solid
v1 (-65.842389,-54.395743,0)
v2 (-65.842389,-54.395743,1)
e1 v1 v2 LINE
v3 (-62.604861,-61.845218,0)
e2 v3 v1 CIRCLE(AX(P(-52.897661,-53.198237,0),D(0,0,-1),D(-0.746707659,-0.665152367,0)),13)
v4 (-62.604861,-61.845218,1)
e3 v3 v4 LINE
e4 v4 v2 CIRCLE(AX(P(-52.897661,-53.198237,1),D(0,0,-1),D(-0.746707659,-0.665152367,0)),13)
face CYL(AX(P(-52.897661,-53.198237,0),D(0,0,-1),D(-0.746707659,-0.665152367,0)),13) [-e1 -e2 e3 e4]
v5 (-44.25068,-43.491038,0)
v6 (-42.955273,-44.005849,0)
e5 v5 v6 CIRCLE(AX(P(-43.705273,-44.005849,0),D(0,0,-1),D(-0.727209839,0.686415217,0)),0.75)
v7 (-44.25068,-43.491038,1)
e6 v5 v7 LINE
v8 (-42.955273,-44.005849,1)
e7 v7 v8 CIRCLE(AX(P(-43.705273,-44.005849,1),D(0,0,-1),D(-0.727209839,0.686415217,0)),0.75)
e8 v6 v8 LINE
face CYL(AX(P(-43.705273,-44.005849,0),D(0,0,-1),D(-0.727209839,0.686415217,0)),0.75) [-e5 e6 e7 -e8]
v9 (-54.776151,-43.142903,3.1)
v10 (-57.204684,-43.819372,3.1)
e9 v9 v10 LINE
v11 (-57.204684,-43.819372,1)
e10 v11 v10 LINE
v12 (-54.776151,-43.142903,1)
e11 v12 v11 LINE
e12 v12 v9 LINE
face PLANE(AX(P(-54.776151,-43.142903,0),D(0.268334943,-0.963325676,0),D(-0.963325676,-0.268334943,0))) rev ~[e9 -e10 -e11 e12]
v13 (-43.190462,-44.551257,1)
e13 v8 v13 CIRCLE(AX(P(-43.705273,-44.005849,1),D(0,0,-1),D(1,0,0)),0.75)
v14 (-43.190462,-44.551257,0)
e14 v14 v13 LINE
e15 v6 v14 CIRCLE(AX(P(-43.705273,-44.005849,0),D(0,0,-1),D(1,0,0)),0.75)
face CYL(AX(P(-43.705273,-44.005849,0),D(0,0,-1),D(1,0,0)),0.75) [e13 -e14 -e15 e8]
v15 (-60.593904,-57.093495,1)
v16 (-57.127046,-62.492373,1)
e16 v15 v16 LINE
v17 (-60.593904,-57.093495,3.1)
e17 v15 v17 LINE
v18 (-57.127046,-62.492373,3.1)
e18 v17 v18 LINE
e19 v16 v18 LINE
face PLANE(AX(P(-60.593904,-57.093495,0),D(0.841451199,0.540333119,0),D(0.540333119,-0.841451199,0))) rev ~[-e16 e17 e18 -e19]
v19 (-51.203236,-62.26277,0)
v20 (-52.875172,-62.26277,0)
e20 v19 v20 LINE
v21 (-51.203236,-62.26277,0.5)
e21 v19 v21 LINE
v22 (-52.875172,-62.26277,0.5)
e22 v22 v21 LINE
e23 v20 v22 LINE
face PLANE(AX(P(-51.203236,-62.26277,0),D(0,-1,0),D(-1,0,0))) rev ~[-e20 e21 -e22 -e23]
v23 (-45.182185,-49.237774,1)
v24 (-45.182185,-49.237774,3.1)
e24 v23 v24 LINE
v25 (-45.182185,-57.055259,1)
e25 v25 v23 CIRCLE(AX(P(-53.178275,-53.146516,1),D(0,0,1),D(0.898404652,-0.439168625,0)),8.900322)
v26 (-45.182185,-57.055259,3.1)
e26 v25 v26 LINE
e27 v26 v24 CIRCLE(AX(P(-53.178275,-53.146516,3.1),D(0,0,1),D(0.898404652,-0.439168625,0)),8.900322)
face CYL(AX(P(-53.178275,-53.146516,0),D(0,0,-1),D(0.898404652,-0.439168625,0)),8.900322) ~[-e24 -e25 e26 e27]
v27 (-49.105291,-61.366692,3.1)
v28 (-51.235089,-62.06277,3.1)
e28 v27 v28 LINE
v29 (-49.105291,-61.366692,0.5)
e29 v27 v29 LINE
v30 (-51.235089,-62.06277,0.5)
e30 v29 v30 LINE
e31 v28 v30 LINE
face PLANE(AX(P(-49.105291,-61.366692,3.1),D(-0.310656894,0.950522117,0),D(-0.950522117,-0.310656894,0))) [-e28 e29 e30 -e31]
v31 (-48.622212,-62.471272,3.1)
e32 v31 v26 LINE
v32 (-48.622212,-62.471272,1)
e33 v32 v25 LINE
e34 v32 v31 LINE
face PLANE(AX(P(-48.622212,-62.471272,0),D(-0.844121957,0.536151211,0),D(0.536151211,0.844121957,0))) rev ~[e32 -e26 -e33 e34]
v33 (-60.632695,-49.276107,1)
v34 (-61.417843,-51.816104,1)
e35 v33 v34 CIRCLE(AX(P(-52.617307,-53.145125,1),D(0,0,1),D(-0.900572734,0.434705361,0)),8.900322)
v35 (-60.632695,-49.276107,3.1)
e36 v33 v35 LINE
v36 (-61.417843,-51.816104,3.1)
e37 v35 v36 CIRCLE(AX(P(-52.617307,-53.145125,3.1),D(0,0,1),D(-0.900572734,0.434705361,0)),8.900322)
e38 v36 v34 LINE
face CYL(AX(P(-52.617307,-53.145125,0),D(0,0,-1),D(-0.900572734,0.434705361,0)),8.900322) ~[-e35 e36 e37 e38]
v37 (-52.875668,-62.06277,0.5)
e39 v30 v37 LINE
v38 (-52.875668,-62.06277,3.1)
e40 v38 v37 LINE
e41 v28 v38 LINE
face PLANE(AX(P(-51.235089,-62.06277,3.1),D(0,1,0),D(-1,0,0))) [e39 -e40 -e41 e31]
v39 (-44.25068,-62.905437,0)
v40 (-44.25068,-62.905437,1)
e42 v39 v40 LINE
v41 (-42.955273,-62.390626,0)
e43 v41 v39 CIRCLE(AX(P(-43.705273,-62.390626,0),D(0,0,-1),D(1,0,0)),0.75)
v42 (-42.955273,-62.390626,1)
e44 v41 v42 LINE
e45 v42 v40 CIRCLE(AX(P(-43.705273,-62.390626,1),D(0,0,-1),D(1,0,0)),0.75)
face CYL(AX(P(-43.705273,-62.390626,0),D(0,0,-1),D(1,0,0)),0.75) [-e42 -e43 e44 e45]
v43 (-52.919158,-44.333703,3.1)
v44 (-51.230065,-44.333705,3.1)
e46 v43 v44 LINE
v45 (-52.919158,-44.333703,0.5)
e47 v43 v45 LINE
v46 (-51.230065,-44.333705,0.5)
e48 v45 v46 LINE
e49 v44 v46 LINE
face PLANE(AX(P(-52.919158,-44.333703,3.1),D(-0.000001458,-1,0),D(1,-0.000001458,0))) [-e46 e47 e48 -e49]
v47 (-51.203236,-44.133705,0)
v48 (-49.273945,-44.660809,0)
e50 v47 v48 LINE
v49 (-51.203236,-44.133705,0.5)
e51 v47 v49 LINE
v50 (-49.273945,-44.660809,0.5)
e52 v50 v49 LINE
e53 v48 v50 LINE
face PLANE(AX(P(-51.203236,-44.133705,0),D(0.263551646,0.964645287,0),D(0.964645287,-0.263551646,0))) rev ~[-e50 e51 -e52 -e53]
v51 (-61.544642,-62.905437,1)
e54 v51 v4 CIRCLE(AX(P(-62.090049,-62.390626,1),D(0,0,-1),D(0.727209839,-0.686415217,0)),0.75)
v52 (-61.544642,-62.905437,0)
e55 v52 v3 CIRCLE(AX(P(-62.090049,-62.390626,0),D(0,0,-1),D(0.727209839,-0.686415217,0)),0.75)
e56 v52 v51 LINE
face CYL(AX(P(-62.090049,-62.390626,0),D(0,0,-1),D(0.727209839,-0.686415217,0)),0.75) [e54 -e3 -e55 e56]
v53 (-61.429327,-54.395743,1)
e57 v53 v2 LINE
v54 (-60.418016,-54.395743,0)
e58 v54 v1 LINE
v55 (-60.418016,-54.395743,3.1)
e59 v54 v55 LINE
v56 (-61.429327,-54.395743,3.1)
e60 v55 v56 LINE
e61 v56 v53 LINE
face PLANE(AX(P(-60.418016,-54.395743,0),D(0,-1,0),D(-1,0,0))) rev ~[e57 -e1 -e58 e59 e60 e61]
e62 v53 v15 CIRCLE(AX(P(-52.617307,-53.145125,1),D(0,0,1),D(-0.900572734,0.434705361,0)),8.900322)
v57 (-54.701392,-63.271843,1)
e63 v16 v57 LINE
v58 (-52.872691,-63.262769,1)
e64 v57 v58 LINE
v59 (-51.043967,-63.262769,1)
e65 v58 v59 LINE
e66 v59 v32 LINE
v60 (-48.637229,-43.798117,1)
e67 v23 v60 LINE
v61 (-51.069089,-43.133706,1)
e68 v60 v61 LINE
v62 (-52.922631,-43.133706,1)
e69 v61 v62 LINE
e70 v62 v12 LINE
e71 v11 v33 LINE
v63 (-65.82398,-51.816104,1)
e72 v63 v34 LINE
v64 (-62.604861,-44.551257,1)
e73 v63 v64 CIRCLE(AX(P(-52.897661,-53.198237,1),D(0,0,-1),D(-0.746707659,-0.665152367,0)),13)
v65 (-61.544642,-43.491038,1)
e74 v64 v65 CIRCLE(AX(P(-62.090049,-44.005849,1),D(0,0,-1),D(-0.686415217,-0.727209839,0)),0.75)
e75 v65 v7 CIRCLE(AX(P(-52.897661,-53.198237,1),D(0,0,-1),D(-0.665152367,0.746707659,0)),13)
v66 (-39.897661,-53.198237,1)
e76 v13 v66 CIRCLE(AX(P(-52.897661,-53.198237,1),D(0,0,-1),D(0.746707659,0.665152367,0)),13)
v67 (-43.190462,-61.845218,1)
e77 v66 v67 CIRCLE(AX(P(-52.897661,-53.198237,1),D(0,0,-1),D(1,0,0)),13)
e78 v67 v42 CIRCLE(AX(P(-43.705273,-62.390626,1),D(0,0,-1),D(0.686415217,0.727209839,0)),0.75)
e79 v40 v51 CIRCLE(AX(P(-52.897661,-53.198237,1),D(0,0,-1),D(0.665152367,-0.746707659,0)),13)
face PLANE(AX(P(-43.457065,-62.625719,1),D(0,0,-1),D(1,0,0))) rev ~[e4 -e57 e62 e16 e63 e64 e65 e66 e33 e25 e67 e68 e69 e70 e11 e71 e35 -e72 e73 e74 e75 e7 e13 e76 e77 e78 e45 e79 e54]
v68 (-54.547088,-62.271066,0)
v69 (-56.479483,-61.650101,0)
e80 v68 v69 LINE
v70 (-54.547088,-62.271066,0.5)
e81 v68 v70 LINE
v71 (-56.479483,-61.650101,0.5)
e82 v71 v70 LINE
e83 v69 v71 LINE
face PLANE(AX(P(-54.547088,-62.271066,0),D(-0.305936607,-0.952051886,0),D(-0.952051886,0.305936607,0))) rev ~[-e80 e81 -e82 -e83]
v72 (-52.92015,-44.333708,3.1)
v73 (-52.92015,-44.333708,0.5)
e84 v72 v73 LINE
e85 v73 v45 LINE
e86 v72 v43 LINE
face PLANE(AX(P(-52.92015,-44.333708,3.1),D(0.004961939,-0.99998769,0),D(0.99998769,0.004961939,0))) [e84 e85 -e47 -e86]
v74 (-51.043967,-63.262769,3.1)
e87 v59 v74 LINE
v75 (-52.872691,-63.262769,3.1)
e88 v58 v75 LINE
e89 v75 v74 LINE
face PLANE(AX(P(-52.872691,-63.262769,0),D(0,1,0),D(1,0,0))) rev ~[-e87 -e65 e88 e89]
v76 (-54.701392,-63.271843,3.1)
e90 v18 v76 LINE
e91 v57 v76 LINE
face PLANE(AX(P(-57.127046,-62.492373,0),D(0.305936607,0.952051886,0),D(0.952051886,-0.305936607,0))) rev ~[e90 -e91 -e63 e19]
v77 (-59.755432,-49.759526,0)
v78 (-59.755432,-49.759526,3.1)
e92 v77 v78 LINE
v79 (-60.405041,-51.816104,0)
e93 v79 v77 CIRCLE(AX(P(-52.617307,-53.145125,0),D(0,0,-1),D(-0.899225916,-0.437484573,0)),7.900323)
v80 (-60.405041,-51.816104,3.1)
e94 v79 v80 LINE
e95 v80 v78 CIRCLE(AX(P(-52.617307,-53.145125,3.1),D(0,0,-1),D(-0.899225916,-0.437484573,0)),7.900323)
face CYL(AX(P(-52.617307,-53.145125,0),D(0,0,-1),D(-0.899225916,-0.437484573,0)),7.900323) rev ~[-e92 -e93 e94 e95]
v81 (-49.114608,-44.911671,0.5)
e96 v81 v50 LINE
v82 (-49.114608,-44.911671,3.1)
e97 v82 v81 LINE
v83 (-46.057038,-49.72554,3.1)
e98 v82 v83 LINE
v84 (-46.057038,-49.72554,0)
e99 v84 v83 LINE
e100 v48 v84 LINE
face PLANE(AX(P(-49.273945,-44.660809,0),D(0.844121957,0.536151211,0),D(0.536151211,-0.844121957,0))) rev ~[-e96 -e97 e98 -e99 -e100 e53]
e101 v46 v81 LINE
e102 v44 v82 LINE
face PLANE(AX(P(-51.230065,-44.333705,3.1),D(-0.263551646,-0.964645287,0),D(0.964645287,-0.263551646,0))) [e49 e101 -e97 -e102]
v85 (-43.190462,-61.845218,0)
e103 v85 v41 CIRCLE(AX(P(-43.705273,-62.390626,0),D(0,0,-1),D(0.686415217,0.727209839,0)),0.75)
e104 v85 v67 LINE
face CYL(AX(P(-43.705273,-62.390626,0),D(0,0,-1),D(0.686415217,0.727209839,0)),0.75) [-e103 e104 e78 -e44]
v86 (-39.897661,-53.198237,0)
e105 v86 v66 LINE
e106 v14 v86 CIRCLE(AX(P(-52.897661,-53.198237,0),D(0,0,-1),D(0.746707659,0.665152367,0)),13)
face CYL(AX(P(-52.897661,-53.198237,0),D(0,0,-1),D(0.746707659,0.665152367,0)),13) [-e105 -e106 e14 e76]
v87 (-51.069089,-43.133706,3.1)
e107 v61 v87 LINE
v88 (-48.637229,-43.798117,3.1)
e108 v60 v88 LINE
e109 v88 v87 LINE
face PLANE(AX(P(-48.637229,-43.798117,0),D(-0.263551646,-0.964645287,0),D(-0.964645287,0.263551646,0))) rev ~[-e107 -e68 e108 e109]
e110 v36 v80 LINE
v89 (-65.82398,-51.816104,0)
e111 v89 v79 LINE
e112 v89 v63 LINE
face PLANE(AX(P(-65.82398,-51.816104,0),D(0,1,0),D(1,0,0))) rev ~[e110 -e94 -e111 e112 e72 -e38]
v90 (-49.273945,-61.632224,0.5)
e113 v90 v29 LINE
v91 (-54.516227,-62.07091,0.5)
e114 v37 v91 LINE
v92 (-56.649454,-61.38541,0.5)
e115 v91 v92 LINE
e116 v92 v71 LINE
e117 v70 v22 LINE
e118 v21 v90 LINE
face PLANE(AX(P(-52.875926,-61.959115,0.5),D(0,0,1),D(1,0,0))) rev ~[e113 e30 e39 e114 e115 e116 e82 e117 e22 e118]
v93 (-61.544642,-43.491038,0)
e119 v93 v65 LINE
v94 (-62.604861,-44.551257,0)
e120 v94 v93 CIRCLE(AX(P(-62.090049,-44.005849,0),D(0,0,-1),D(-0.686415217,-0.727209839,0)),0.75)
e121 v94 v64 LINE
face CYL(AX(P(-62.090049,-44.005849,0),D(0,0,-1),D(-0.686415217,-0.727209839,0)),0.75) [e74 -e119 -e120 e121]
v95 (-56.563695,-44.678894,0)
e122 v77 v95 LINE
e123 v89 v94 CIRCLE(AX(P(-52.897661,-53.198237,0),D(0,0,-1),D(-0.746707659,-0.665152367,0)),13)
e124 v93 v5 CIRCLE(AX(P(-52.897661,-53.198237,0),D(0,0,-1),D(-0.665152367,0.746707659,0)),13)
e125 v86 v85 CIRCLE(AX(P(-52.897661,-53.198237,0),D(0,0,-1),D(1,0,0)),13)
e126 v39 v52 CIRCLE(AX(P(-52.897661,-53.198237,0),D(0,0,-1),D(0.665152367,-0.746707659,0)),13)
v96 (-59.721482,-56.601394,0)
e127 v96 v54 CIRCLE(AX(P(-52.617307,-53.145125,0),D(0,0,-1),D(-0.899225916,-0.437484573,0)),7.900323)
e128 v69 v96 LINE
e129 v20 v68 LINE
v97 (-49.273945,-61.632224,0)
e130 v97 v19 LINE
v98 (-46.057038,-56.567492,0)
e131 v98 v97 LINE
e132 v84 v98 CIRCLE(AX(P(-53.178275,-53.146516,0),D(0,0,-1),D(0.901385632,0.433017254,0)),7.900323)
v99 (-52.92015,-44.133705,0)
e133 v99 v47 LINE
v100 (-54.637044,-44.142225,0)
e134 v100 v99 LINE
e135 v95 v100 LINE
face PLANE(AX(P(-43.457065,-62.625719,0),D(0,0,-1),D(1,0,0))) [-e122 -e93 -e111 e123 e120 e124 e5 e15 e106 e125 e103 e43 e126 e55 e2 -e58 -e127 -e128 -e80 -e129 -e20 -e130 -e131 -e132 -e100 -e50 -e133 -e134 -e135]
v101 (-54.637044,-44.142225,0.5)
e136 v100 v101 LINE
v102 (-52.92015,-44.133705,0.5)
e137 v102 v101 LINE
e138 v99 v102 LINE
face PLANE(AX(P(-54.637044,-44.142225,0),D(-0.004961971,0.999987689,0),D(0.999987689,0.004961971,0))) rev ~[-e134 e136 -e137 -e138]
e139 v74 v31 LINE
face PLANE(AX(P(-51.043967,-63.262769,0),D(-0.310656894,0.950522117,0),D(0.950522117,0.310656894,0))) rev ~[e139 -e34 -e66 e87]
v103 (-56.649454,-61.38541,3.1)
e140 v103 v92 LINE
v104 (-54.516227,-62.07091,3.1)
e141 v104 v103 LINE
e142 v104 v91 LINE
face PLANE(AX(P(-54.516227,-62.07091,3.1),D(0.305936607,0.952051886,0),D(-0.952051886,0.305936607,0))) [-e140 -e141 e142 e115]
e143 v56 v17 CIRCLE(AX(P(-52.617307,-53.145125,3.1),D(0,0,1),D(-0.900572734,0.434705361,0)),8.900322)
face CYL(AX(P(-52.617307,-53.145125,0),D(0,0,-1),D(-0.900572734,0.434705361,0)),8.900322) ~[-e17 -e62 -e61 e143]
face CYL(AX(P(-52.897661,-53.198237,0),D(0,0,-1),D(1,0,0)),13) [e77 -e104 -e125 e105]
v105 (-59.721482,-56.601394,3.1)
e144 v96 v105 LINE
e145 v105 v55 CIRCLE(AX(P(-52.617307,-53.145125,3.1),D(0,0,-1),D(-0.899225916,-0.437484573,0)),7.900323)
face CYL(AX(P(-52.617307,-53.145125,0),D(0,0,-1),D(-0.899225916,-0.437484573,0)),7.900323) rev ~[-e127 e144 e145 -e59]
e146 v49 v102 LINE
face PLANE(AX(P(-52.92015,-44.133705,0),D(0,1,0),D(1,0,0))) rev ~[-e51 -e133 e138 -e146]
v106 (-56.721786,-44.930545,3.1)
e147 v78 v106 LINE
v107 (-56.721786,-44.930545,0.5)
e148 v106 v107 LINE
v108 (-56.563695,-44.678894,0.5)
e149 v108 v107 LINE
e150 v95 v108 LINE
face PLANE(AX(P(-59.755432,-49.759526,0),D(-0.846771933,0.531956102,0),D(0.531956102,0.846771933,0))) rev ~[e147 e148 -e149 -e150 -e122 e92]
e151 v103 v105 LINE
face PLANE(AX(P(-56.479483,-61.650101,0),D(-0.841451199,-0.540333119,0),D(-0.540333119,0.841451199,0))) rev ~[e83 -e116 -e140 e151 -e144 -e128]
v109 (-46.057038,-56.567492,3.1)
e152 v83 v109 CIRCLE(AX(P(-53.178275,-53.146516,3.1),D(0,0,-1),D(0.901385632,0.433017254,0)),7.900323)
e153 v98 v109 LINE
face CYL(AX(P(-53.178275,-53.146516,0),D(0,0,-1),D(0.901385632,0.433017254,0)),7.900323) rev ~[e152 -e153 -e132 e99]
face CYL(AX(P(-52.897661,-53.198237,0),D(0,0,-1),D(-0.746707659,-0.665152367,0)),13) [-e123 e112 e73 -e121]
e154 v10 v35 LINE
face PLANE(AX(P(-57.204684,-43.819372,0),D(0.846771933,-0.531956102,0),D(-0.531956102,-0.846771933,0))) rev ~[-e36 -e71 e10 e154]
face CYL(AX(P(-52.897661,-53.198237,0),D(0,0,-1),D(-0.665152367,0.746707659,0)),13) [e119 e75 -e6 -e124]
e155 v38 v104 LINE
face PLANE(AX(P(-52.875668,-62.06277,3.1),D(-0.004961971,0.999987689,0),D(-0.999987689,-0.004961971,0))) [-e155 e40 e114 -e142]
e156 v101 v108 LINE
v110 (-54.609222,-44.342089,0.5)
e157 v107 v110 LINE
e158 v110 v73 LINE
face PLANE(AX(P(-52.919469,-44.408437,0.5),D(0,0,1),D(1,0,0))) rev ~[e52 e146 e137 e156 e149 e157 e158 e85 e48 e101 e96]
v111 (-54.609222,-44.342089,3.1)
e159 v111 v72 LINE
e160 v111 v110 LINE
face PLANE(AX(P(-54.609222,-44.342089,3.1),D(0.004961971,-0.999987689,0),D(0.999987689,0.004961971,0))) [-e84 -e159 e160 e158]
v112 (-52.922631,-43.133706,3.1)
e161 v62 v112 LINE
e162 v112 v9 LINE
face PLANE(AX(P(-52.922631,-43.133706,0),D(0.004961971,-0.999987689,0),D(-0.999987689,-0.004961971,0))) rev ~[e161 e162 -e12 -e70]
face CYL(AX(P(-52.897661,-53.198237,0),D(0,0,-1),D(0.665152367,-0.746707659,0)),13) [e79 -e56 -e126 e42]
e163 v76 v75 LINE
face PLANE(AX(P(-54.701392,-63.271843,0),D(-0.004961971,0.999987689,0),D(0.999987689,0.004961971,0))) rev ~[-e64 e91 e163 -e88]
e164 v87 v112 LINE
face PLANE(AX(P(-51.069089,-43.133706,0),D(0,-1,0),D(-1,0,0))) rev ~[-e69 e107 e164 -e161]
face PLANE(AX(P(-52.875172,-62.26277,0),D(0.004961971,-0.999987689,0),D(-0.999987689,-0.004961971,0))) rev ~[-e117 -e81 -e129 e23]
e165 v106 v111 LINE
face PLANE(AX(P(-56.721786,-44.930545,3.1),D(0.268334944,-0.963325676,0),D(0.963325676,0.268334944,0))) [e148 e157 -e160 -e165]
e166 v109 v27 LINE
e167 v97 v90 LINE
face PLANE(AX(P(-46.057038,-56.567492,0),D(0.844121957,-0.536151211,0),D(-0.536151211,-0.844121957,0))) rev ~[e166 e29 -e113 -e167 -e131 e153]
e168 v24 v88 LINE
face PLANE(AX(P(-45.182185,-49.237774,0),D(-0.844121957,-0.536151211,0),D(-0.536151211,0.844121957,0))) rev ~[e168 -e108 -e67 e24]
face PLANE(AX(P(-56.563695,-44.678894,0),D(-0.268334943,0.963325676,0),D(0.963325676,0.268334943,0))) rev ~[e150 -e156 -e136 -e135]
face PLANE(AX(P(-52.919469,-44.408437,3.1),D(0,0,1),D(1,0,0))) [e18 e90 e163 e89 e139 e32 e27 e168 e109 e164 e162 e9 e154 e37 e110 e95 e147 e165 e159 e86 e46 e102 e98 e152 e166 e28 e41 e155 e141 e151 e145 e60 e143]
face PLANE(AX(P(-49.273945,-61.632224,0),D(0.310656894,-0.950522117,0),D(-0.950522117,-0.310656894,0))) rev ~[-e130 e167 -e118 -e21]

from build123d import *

# Parameters (mm, degrees)
F1_DEPTH = 3.1
F3_DEPTH = 1
F5_DEPTH = 3.1
F7_DEPTH = 2.6


# Not quite as in the source:
# - ends of sketch curves that miss each other by under 0.0002 mm in the source are joined


with BuildPart() as f1:
    # F0 (on Top) → F1 (new body)
    with BuildSketch(Plane.XY):
        with BuildLine():
            Line((-45.1821846682, -49.2377741688), (-48.6372292437, -43.7981166044))
            Line((-48.6372292437, -43.7981166044), (-51.0690886894, -43.1337059986))
            Line((-51.0690886894, -43.1337059986), (-52.9226313652, -43.1337059986))
            Line((-52.9226313652, -43.1337059986), (-54.7761512226, -43.1429032238))
            Line((-54.7761512226, -43.1429032238), (-57.2046839443, -43.8193724666))
            Line((-57.2046839443, -43.8193724666), (-60.6326945623, -49.2761068966))
            ThreePointArc((-60.6326945623, -49.2761068966), (-61.5175196788, -53.1892877339), (-60.5939044307, -57.0934950318))
            Line((-60.5939044307, -57.0934950318), (-57.1270457212, -62.4923727119))
            Line((-57.1270457212, -62.4923727119), (-54.7013924586, -63.2718429691))
            Line((-54.7013924586, -63.2718429691), (-52.8726911435, -63.2627688943))
            Line((-52.8726911435, -63.2627688943), (-51.0439673156, -63.2627688943))
            Line((-51.0439673156, -63.2627688943), (-48.6222116233, -62.4712722115))
            Line((-48.6222116233, -62.4712722115), (-45.1821846682, -57.0552585424))
            ThreePointArc((-45.1821846682, -57.0552585424), (-44.2779533541, -53.1465163556), (-45.1821846682, -49.2377741688))
        make_face()
        with BuildLine():
            Line((-51.2032357795, -44.1337052485), (-49.2739452053, -44.6608085404))
            Line((-49.2739452053, -44.6608085404), (-46.0570379398, -49.725540285))
            ThreePointArc((-46.0570379398, -49.725540285), (-45.277952604, -53.1465163556), (-46.0570379398, -56.5674924262))
            Line((-46.0570379398, -56.5674924262), (-49.2739452053, -61.6322241709))
            Line((-49.2739452053, -61.6322241709), (-51.2032357795, -62.2627696444))
            Line((-51.2032357795, -62.2627696444), (-52.8751721425, -62.2627696444))
            Line((-52.8751721425, -62.2627696444), (-54.5470879228, -62.2710657443))
            Line((-54.5470879228, -62.2710657443), (-56.4794834946, -61.6501011173))
            Line((-56.4794834946, -61.6501011173), (-59.7214822105, -56.6013939237))
            ThreePointArc((-59.7214822105, -56.6013939237), (-60.5175327396, -53.1843257665), (-59.7554317793, -49.7595260114))
            Line((-59.7554317793, -49.7595260114), (-56.5636951686, -44.678894416))
            Line((-56.5636951686, -44.678894416), (-54.6370438166, -44.1422245291))
            Line((-54.6370438166, -44.1422245291), (-52.9201503662, -44.1337052485))
            Line((-52.9201503662, -44.1337052485), (-51.2032357795, -44.1337052485))
        make_face(mode=Mode.SUBTRACT)
    extrude(amount=F1_DEPTH)

    # F2 (on face) → F3 (join)
    with BuildSketch(Plane(origin=(0, 0, 0), x_dir=(1, 0, 0), z_dir=(0, 0, -1))):
        with BuildLine():
            ThreePointArc((-43.358584194, 62.0303384897), (-43.2740778057, 61.9381826183), (-43.1904616862, 61.8452182226))
            ThreePointArc((-43.1904616862, 61.8452182226), (-43.0165755747, 62.0936479592), (-42.9552730989, 62.3906256019))
            ThreePointArc((-42.9552730989, 62.3906256019), (-43.4282853143, 63.0876031964), (-44.2506804781, 62.9054370146))
            ThreePointArc((-44.2506804781, 62.9054370146), (-44.1577160825, 62.8218208951), (-44.0655602111, 62.7373145068))
            ThreePointArc((-44.0655602111, 62.7373145068), (-43.5183821629, 62.8543839205), (-43.2052730989, 62.3906256019))
            ThreePointArc((-43.2052730989, 62.3906256019), (-43.2451945988, 62.1948507981), (-43.358584194, 62.0303384897))
        make_face()
        with BuildLine():
            ThreePointArc((-44.0655602111, 62.7373145068), (-43.7052730989, 62.3906256019), (-43.358584194, 62.0303384897))
            ThreePointArc((-43.358584194, 62.0303384897), (-43.2451945988, 62.1948507981), (-43.2052730989, 62.3906256019))
            ThreePointArc((-43.2052730989, 62.3906256019), (-43.5183821629, 62.8543839205), (-44.0655602111, 62.7373145068))
        make_face()
        with BuildLine():
            ThreePointArc((-44.0655602111, 62.7373145068), (-44.0588264895, 62.0370722113), (-43.358584194, 62.0303384897))
            ThreePointArc((-43.358584194, 62.0303384897), (-43.7052730989, 62.3906256019), (-44.0655602111, 62.7373145068))
        make_face()
        with BuildLine():
            ThreePointArc((-43.1904616862, 44.5512566703), (-40.748719029, 48.5718778834), (-39.8976612543, 53.1982374465))
            ThreePointArc((-39.8976612543, 53.1982374465), (-40.748719029, 57.8245970095), (-43.1904616862, 61.8452182226))
            ThreePointArc((-43.1904616862, 61.8452182226), (-44.2356031848, 61.860295516), (-44.2506804781, 62.9054370146))
            ThreePointArc((-44.2506804781, 62.9054370146), (-52.8976612543, 66.1982374465), (-61.5446420305, 62.9054370146))
            ThreePointArc((-61.5446420305, 62.9054370146), (-61.3930718153, 62.6676133864), (-61.3400494097, 62.3906256019))
            ThreePointArc((-61.3400494097, 62.3906256019), (-61.7930717671, 61.7019280777), (-62.6048608225, 61.8452182226))
            ThreePointArc((-62.6048608225, 61.8452182226), (-65.8976612543, 53.1982374465), (-62.6048608225, 44.5512566703))
            ThreePointArc((-62.6048608225, 44.5512566703), (-61.7930717671, 44.6945468152), (-61.3400494097, 44.005849291))
            ThreePointArc((-61.3400494097, 44.005849291), (-61.3930718153, 43.7288615065), (-61.5446420305, 43.4910378783))
            ThreePointArc((-61.5446420305, 43.4910378783), (-52.8976612543, 40.1982374465), (-44.2506804781, 43.4910378783))
            ThreePointArc((-44.2506804781, 43.4910378783), (-44.2356031848, 44.5361793769), (-43.1904616862, 44.5512566703))
        make_face()
        with BuildLine():
            Line((-45.1821846682, 49.2377741688), (-48.6372292437, 43.7981166044))
            Line((-48.6372292437, 43.7981166044), (-51.0690886894, 43.1337059986))
            Line((-51.0690886894, 43.1337059986), (-52.9226313652, 43.1337059986))
            Line((-52.9226313652, 43.1337059986), (-54.7761512226, 43.1429032238))
            Line((-54.7761512226, 43.1429032238), (-57.2046839443, 43.8193724666))
            Line((-57.2046839443, 43.8193724666), (-60.6326945623, 49.2761068966))
            ThreePointArc((-60.6326945623, 49.2761068966), (-61.5175196788, 53.1892877339), (-60.5939044307, 57.0934950318))
            Line((-60.5939044307, 57.0934950318), (-57.1270457212, 62.4923727119))
            Line((-57.1270457212, 62.4923727119), (-54.7013924586, 63.2718429691))
            Line((-54.7013924586, 63.2718429691), (-52.8726911435, 63.2627688943))
            Line((-52.8726911435, 63.2627688943), (-51.0439673156, 63.2627688943))
            Line((-51.0439673156, 63.2627688943), (-48.6222116233, 62.4712722115))
            Line((-48.6222116233, 62.4712722115), (-45.1821846682, 57.0552585424))
            ThreePointArc((-45.1821846682, 57.0552585424), (-44.2779533541, 53.1465163556), (-45.1821846682, 49.2377741688))
        make_face(mode=Mode.SUBTRACT)
        with BuildLine():
            ThreePointArc((-44.2506804781, 62.9054370146), (-44.2356031848, 61.860295516), (-43.1904616862, 61.8452182226))
            ThreePointArc((-43.1904616862, 61.8452182226), (-43.2740778057, 61.9381826183), (-43.358584194, 62.0303384897))
            ThreePointArc((-43.358584194, 62.0303384897), (-44.0588264895, 62.0370722113), (-44.0655602111, 62.7373145068))
            ThreePointArc((-44.0655602111, 62.7373145068), (-44.1577160825, 62.8218208951), (-44.2506804781, 62.9054370146))
        make_face()
        with BuildLine():
            ThreePointArc((-61.7297622975, 62.7373145068), (-61.6376064262, 62.8218208951), (-61.5446420305, 62.9054370146))
            ThreePointArc((-61.5446420305, 62.9054370146), (-62.6203794956, 62.9209556878), (-62.6048608225, 61.8452182226))
            ThreePointArc((-62.6048608225, 61.8452182226), (-62.521244703, 61.9381826183), (-62.4367383146, 62.0303384897))
            ThreePointArc((-62.4367383146, 62.0303384897), (-62.4436028003, 62.7441789925), (-61.7297622975, 62.7373145068))
        make_face()
        with BuildLine():
            ThreePointArc((-61.3400494097, 62.3906256019), (-61.3930718153, 62.6676133864), (-61.5446420305, 62.9054370146))
            ThreePointArc((-61.5446420305, 62.9054370146), (-61.6376064262, 62.8218208951), (-61.7297622975, 62.7373145068))
            ThreePointArc((-61.7297622975, 62.7373145068), (-61.6262910912, 62.5775165378), (-61.5900494097, 62.3906256019))
            ThreePointArc((-61.5900494097, 62.3906256019), (-61.894274606, 61.9305471018), (-62.4367383146, 62.0303384897))
            ThreePointArc((-62.4367383146, 62.0303384897), (-62.521244703, 61.9381826183), (-62.6048608225, 61.8452182226))
            ThreePointArc((-62.6048608225, 61.8452182226), (-61.7930717671, 61.7019280777), (-61.3400494097, 62.3906256019))
        make_face()
        with BuildLine():
            ThreePointArc((-62.4367383146, 62.0303384897), (-62.0900494097, 62.3906256019), (-61.7297622975, 62.7373145068))
            ThreePointArc((-61.7297622975, 62.7373145068), (-62.4436028003, 62.7441789925), (-62.4367383146, 62.0303384897))
        make_face()
        with BuildLine():
            ThreePointArc((-61.5900494097, 62.3906256019), (-61.6262910912, 62.5775165378), (-61.7297622975, 62.7373145068))
            ThreePointArc((-61.7297622975, 62.7373145068), (-62.0900494097, 62.3906256019), (-62.4367383146, 62.0303384897))
            ThreePointArc((-62.4367383146, 62.0303384897), (-61.894274606, 61.9305471018), (-61.5900494097, 62.3906256019))
        make_face()
        with BuildLine():
            ThreePointArc((-42.9552730989, 44.005849291), (-43.0165755747, 44.3028269337), (-43.1904616862, 44.5512566703))
            ThreePointArc((-43.1904616862, 44.5512566703), (-43.2740778057, 44.4582922746), (-43.358584194, 44.3661364032))
            ThreePointArc((-43.358584194, 44.3661364032), (-43.2451945988, 44.2016240948), (-43.2052730989, 44.005849291))
            ThreePointArc((-43.2052730989, 44.005849291), (-43.5183821629, 43.5420909724), (-44.0655602111, 43.6591603861))
            ThreePointArc((-44.0655602111, 43.6591603861), (-44.1577160825, 43.5746539978), (-44.2506804781, 43.4910378783))
            ThreePointArc((-44.2506804781, 43.4910378783), (-43.4282853143, 43.3088716965), (-42.9552730989, 44.005849291))
        make_face()
        with BuildLine():
            ThreePointArc((-43.2052730989, 44.005849291), (-43.2451945988, 44.2016240948), (-43.358584194, 44.3661364032))
            ThreePointArc((-43.358584194, 44.3661364032), (-43.7052730989, 44.005849291), (-44.0655602111, 43.6591603861))
            ThreePointArc((-44.0655602111, 43.6591603861), (-43.5183821629, 43.5420909724), (-43.2052730989, 44.005849291))
        make_face()
        with BuildLine():
            ThreePointArc((-44.0655602111, 43.6591603861), (-43.7052730989, 44.005849291), (-43.358584194, 44.3661364032))
            ThreePointArc((-43.358584194, 44.3661364032), (-44.0588264895, 44.3594026816), (-44.0655602111, 43.6591603861))
        make_face()
        with BuildLine():
            ThreePointArc((-43.358584194, 44.3661364032), (-43.2740778057, 44.4582922746), (-43.1904616862, 44.5512566703))
            ThreePointArc((-43.1904616862, 44.5512566703), (-44.2356031848, 44.5361793769), (-44.2506804781, 43.4910378783))
            ThreePointArc((-44.2506804781, 43.4910378783), (-44.1577160825, 43.5746539978), (-44.0655602111, 43.6591603861))
            ThreePointArc((-44.0655602111, 43.6591603861), (-44.0588264895, 44.3594026816), (-43.358584194, 44.3661364032))
        make_face()
        with BuildLine():
            ThreePointArc((-62.6048608225, 44.5512566703), (-62.6203794956, 43.4755192051), (-61.5446420305, 43.4910378783))
            ThreePointArc((-61.5446420305, 43.4910378783), (-61.6376064262, 43.5746539978), (-61.7297622975, 43.6591603861))
            ThreePointArc((-61.7297622975, 43.6591603861), (-62.4436028003, 43.6522959004), (-62.4367383146, 44.3661364032))
            ThreePointArc((-62.4367383146, 44.3661364032), (-62.521244703, 44.4582922746), (-62.6048608225, 44.5512566703))
        make_face()
        with BuildLine():
            ThreePointArc((-62.4367383146, 44.3661364032), (-62.4436028003, 43.6522959004), (-61.7297622975, 43.6591603861))
            ThreePointArc((-61.7297622975, 43.6591603861), (-62.0900494097, 44.005849291), (-62.4367383146, 44.3661364032))
        make_face()
        with BuildLine():
            ThreePointArc((-62.4367383146, 44.3661364032), (-62.0900494097, 44.005849291), (-61.7297622975, 43.6591603861))
            ThreePointArc((-61.7297622975, 43.6591603861), (-61.6262910912, 43.8189583551), (-61.5900494097, 44.005849291))
            ThreePointArc((-61.5900494097, 44.005849291), (-61.894274606, 44.4659277911), (-62.4367383146, 44.3661364032))
        make_face()
        with BuildLine():
            ThreePointArc((-61.7297622975, 43.6591603861), (-61.6376064262, 43.5746539978), (-61.5446420305, 43.4910378783))
            ThreePointArc((-61.5446420305, 43.4910378783), (-61.3930718153, 43.7288615065), (-61.3400494097, 44.005849291))
            ThreePointArc((-61.3400494097, 44.005849291), (-61.7930717671, 44.6945468152), (-62.6048608225, 44.5512566703))
            ThreePointArc((-62.6048608225, 44.5512566703), (-62.521244703, 44.4582922746), (-62.4367383146, 44.3661364032))
            ThreePointArc((-62.4367383146, 44.3661364032), (-61.894274606, 44.4659277911), (-61.5900494097, 44.005849291))
            ThreePointArc((-61.5900494097, 44.005849291), (-61.6262910912, 43.8189583551), (-61.7297622975, 43.6591603861))
        make_face()
    extrude(amount=-F3_DEPTH)

    # F4 (on face) → F5 (cut)
    with BuildSketch(Plane(origin=(0, 0, 0), x_dir=(1, 0, 0), z_dir=(0, 0, -1))):
        with BuildLine():
            Line((-60.4180157971, 54.3957427144), (-65.8423891824, 54.3957427144))
            ThreePointArc((-65.8423891824, 54.3957427144), (-65.8973302268, 53.1054656449), (-65.8239796584, 51.8161041253))
            Line((-65.8239796584, 51.8161041253), (-60.4050414596, 51.8161041253))
            ThreePointArc((-60.4050414596, 51.8161041253), (-60.5175300761, 53.1053902837), (-60.4180157971, 54.3957427144))
        make_face()
    extrude(amount=-F5_DEPTH, mode=Mode.SUBTRACT)

    # F6 (on face) → F7 (join)
    with BuildSketch(Plane.XY.offset(3.1)):
        Polygon((-56.5636951686, -44.678894416), (-56.7217861266, -44.930544854), (-54.6092223145, -44.34208894), (-52.920150354, -44.3337077106), (-52.919157972, -44.3337027864), (-51.2300652176, -44.3337052485), (-49.1146075113, -44.9116714376), (-49.2739452053, -44.6608085404), (-51.2032357795, -44.1337052485), (-52.9201503662, -44.1337052485), (-54.6370438166, -44.1422245291), align=None)
        Polygon((-49.2739452053, -61.6322241709), (-49.1052905017, -61.3666924783), (-51.2350894961, -62.0627696444), (-52.8756683426, -62.0627696444), (-54.5162269925, -62.0709101492), (-56.6494536825, -61.3854095534), (-56.4794834946, -61.6501011173), (-54.5470879228, -62.2710657443), (-52.8751721425, -62.2627696444), (-51.2032357795, -62.2627696444), align=None)
    extrude(amount=-F7_DEPTH)


solid = f1.part
